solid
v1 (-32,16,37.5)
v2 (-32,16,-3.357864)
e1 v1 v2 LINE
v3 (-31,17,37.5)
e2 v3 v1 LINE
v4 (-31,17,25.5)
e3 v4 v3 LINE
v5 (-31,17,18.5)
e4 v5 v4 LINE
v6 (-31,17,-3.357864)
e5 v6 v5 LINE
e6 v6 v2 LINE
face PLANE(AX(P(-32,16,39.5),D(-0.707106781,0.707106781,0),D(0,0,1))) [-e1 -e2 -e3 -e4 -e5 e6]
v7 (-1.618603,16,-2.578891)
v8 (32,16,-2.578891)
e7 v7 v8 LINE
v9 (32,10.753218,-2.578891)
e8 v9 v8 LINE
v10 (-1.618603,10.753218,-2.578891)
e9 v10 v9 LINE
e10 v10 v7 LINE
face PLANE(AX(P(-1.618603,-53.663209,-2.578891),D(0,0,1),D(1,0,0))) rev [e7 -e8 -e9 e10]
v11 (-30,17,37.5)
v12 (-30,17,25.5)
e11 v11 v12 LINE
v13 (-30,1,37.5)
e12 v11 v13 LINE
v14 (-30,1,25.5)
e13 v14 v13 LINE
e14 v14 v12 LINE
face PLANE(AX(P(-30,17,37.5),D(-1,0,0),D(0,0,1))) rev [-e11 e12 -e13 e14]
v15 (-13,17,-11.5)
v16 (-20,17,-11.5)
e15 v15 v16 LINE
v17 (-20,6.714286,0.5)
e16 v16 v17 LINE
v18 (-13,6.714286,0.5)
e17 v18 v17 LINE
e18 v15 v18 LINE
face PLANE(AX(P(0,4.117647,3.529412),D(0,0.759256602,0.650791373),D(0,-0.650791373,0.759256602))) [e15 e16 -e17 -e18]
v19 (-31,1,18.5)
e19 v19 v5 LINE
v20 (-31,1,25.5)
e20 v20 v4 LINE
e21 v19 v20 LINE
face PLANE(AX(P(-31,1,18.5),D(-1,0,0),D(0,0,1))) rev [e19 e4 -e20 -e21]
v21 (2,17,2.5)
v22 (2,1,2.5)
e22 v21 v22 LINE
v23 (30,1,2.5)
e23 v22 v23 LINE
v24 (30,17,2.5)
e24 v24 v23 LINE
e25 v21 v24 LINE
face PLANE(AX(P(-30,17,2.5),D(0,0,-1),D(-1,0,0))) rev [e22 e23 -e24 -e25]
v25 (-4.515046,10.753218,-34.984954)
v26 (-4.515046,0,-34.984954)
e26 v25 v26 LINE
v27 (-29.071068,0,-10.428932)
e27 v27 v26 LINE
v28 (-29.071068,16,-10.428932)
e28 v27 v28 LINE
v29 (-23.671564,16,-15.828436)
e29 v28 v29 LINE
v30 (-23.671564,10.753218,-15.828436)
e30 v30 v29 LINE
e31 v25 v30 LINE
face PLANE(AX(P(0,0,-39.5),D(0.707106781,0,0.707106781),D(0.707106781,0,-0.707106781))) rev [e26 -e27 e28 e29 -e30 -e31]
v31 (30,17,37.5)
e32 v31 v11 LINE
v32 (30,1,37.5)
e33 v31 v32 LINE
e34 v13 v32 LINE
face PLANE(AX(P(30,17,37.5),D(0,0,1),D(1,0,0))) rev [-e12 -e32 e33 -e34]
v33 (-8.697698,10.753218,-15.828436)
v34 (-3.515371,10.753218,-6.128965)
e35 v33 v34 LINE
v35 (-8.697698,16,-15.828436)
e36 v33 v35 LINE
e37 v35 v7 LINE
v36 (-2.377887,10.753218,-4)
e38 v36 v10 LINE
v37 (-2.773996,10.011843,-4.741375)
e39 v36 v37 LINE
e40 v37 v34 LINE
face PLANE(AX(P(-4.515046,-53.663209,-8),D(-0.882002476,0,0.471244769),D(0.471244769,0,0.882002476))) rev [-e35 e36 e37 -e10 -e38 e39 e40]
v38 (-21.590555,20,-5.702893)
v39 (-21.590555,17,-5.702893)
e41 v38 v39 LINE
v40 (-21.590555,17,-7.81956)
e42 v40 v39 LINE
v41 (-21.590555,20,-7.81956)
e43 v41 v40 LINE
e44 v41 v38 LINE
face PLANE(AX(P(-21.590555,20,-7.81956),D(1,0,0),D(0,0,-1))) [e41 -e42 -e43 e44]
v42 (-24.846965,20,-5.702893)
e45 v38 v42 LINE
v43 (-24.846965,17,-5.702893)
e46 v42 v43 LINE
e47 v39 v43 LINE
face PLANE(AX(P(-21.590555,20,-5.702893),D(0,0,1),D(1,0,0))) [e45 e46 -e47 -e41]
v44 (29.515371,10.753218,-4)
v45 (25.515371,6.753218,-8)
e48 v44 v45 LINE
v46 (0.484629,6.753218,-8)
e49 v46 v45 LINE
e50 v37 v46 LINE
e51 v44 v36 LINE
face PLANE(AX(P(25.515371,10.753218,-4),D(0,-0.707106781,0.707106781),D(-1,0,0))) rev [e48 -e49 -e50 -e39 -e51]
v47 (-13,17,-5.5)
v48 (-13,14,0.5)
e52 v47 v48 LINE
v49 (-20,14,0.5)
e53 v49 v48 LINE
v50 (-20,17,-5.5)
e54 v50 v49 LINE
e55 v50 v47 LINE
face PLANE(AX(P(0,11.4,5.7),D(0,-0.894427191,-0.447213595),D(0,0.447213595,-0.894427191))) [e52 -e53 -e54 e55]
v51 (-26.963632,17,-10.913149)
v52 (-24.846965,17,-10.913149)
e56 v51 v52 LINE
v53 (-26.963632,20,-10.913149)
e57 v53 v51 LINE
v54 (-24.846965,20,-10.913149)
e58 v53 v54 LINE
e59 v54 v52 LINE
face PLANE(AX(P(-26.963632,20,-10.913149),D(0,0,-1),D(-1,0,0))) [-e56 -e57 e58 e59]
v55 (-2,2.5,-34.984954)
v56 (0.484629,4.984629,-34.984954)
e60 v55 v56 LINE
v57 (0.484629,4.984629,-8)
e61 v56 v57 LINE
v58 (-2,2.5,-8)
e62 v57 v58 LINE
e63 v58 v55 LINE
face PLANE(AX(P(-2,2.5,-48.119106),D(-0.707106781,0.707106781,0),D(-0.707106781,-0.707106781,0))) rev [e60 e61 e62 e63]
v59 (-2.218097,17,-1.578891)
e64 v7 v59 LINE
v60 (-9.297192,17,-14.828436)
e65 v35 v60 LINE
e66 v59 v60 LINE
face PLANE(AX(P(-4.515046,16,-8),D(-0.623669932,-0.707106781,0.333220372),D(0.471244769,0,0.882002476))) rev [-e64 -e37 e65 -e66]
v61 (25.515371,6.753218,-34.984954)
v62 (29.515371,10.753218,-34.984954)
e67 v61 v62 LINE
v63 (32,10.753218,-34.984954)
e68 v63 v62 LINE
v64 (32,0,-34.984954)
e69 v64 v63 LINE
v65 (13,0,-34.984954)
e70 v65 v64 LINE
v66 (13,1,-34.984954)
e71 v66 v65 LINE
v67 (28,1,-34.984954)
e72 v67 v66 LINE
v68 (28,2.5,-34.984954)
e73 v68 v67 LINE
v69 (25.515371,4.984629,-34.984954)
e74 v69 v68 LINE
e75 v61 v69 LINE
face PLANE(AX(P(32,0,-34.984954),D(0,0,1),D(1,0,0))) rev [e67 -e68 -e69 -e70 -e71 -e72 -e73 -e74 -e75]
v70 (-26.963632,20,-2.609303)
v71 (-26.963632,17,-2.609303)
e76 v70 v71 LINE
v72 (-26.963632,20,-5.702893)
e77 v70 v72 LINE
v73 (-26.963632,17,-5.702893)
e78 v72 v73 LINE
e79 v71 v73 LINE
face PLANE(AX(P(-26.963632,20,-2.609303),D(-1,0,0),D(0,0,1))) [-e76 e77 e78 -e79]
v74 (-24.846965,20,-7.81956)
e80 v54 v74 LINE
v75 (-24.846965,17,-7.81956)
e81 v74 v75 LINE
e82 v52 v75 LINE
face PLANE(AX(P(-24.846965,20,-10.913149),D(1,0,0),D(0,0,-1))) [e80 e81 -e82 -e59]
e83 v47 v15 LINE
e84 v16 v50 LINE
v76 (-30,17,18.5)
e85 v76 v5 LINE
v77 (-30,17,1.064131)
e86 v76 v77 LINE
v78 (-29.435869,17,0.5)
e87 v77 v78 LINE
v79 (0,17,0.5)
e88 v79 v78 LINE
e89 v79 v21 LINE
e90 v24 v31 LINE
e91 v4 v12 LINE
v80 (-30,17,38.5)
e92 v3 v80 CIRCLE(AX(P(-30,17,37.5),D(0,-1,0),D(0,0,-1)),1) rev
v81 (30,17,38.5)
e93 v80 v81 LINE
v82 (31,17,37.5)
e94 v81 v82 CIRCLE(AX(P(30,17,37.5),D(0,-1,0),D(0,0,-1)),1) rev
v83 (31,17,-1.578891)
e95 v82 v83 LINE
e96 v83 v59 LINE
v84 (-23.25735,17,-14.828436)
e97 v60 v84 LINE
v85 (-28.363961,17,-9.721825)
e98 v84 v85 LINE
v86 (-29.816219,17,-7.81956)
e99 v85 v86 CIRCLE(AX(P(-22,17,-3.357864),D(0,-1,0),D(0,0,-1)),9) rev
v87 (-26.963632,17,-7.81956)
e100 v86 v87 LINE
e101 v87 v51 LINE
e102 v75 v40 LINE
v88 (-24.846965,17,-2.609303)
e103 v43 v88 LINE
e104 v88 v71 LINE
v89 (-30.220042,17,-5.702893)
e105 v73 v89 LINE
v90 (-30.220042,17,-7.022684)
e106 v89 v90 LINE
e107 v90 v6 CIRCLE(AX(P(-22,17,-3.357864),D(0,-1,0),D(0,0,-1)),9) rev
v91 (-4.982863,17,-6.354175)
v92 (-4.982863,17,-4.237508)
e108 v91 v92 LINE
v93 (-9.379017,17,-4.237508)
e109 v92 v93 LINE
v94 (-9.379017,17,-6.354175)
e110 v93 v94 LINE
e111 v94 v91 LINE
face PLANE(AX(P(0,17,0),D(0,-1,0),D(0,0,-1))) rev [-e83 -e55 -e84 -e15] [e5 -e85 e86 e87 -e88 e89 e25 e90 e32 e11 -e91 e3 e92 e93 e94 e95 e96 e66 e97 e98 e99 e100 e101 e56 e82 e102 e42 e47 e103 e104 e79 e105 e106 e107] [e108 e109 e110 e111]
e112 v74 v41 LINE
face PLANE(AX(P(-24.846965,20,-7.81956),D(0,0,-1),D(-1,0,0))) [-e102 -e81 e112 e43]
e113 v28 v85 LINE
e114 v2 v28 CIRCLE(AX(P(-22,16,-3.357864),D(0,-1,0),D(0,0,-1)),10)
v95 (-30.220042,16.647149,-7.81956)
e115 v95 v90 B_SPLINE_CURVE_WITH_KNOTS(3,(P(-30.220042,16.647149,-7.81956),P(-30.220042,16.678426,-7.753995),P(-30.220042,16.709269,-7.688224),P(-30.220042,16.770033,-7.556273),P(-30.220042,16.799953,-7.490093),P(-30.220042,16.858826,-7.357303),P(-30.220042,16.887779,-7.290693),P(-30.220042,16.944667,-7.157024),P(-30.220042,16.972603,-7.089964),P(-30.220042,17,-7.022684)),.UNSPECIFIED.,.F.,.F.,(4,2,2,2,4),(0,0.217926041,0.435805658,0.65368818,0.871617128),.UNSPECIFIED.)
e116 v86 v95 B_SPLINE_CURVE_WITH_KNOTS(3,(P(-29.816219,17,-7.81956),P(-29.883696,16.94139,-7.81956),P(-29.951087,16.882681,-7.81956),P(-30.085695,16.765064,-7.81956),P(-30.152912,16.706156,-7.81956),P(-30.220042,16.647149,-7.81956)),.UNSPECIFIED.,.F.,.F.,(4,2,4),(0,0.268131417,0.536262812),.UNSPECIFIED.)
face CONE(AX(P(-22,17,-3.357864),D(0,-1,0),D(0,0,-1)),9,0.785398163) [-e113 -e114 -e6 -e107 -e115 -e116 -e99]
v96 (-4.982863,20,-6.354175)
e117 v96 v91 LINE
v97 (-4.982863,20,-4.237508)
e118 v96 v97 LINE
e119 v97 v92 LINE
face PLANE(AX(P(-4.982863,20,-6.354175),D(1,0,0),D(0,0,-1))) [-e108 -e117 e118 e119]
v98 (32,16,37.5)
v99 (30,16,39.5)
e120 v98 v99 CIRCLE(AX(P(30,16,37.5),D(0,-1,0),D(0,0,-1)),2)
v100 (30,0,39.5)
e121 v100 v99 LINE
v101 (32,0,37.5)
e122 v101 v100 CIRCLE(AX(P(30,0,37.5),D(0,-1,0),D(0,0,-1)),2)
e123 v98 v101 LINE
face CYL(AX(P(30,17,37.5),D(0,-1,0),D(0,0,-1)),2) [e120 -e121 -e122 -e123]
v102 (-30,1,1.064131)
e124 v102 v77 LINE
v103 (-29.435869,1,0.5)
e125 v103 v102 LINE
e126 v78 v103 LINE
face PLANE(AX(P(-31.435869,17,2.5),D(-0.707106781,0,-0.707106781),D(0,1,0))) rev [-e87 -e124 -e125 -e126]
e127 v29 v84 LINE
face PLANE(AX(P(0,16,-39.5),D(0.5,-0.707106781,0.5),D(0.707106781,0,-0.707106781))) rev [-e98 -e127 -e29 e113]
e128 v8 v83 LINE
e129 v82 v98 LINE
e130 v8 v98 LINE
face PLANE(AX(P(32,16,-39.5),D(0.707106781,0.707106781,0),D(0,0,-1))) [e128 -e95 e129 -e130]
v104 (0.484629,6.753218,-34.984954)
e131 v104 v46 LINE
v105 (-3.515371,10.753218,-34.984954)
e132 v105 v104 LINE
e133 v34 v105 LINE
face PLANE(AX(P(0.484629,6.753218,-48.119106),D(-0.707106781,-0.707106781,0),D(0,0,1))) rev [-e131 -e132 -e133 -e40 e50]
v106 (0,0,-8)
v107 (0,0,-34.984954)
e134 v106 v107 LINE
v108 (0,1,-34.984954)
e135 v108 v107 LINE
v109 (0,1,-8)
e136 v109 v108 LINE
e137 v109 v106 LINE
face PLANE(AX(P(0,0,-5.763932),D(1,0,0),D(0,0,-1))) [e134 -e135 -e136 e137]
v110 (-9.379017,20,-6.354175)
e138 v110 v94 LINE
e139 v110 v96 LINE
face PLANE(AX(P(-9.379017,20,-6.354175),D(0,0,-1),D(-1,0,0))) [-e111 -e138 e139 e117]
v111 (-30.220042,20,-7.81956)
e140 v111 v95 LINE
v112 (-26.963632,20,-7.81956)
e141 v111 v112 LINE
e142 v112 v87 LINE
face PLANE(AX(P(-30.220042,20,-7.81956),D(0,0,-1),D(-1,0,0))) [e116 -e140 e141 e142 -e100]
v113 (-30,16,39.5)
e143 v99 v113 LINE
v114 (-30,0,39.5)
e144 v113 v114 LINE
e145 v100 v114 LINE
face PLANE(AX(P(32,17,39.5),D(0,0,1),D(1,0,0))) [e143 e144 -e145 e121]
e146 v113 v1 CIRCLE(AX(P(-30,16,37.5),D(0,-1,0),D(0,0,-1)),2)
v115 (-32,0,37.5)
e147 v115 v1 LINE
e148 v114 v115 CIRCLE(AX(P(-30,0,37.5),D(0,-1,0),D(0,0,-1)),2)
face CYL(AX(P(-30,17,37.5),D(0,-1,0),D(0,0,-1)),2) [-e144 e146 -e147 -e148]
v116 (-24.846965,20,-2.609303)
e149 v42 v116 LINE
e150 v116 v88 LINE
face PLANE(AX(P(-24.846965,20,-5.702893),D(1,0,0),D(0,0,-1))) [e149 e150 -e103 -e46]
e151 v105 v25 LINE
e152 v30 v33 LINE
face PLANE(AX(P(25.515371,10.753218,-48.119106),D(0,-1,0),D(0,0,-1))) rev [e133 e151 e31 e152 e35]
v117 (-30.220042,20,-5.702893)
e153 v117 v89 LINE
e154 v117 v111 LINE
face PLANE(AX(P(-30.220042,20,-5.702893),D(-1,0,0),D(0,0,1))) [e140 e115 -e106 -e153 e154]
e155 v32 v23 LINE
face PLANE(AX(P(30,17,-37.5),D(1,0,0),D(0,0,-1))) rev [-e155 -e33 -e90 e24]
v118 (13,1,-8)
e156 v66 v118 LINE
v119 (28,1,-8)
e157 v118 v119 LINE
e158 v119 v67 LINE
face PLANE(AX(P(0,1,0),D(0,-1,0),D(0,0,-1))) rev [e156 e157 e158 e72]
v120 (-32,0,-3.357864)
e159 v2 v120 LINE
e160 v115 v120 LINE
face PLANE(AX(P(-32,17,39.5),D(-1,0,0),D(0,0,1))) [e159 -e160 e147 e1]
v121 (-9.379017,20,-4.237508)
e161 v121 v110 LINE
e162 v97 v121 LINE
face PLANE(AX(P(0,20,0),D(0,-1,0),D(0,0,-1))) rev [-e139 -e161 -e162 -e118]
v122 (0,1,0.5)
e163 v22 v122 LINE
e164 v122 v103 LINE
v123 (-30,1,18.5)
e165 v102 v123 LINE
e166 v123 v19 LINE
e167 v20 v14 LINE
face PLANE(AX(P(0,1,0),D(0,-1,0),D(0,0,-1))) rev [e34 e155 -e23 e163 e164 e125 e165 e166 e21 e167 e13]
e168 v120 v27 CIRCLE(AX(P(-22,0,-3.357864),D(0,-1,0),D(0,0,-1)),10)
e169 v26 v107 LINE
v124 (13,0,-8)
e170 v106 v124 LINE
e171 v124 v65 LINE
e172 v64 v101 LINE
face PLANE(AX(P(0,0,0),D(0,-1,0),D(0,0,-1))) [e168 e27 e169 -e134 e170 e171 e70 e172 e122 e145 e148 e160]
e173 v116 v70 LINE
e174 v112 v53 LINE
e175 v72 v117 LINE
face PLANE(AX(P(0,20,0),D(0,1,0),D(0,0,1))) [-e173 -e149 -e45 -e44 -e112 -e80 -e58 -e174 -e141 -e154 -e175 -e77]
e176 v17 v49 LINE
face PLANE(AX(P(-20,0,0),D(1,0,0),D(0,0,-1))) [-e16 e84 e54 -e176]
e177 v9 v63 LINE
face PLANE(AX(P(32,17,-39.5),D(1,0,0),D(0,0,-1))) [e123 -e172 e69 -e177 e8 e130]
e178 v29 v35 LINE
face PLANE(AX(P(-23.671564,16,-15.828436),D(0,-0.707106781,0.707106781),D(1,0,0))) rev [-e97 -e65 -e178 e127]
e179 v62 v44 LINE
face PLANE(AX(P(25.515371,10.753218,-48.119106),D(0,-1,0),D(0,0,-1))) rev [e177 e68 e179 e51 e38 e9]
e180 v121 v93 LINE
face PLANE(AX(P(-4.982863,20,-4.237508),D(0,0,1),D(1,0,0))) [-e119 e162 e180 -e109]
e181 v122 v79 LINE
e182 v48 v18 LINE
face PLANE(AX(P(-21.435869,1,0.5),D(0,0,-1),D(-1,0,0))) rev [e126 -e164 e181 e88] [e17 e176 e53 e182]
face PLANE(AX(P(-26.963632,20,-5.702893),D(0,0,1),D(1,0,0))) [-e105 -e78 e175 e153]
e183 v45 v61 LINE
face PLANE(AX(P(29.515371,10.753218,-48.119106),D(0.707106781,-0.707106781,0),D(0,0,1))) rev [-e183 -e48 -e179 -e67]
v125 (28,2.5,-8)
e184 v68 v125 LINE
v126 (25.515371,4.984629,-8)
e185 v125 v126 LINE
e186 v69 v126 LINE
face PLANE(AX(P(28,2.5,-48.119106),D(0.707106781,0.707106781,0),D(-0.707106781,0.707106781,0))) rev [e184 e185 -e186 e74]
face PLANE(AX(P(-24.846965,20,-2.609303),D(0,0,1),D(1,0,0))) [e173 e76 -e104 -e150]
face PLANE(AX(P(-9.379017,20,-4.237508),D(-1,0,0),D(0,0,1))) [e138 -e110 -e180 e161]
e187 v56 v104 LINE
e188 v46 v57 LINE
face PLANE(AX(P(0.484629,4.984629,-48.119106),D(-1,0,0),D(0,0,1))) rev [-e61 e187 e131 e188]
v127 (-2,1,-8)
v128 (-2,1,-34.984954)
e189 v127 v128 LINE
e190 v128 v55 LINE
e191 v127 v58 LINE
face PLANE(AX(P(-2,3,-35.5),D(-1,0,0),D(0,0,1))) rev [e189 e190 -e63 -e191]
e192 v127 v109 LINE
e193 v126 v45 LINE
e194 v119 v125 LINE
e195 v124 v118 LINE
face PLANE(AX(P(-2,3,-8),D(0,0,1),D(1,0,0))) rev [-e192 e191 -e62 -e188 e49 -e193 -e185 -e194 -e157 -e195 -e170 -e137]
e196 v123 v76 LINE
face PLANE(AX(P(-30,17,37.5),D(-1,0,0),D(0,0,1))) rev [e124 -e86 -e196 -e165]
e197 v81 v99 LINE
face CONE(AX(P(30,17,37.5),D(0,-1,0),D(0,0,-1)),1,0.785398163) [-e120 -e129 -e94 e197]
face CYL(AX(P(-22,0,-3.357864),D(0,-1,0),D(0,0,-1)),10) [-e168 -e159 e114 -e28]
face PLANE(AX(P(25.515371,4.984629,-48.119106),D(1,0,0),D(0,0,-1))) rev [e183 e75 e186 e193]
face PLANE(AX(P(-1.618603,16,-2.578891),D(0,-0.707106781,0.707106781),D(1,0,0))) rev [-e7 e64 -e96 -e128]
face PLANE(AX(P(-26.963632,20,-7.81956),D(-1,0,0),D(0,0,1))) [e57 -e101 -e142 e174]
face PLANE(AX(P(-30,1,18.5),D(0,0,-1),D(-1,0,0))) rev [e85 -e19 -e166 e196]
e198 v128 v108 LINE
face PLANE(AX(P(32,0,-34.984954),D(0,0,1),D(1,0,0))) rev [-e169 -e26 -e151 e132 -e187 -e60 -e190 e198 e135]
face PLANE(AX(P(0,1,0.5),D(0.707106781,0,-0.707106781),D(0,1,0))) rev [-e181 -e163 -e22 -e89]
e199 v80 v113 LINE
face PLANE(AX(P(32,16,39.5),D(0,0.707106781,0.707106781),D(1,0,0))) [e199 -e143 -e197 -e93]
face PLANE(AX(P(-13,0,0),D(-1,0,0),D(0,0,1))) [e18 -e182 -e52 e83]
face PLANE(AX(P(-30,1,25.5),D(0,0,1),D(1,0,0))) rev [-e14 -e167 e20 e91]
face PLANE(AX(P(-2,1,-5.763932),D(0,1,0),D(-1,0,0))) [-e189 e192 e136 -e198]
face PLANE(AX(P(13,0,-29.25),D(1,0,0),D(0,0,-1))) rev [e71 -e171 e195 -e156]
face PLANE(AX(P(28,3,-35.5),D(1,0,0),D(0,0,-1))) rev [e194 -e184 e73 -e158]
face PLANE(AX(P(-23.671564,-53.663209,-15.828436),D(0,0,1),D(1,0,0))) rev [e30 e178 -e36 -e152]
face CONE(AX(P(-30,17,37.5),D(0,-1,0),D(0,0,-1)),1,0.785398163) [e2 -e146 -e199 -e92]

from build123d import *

# Parameters (mm, degrees)
SKETCH1_W           = 60
SKETCH1_H           = 75
BOSS_EXTRUDE1_DEPTH = 1
SKETCH2_W           = 64
SKETCH2_H           = 79
SKETCH2_W_2         = 60
SKETCH2_H_2         = 75
BOSS_EXTRUDE2_DEPTH = 17
SKETCH3_W           = 60
SKETCH3_H           = 40
BOSS_EXTRUDE3_DEPTH = 16
SKETCH4_W           = 1
SKETCH4_H           = 7
CUT_EXTRUDE1_DEPTH  = 16
CUT_LOFT2_START     = -20
CUT_LOFT2_DEPTH     = 7
SKETCH7_W           = 21.435869032
SKETCH7_H           = 2
CUT_EXTRUDE2_DEPTH  = 16
CHAMFER1_SIZE       = 10
CHAMFER2_SIZE       = 2
SKETCH9_W           = 30
SKETCH9_H           = 27.5
CUT_EXTRUDE3_DEPTH  = 14
SKETCH10_W          = 2
SKETCH10_H          = 2
BOSS_EXTRUDE5_DEPTH = 7
CUT_EXTRUDE4_DEPTH  = 54.602705156
FILLET1_R           = 10
FILLET2_R           = 10
FILLET3_R           = 2
SKETCH13_W          = 4.396153847
SKETCH13_H          = 2.116666667
BOSS_EXTRUDE7_DEPTH = 3
SKETCH14_W          = 15
SKETCH14_H          = 21.25
CUT_EXTRUDE5_DEPTH  = 52.809748118
CUT_EXTRUDE6_DEPTH  = 9
SKETCH16_W          = 15
SKETCH16_H          = 17.83101705
CUT_EXTRUDE7_DEPTH  = 54.602705156
BOSS_EXTRUDE8_REACH = 62.665
SKETCH18_W          = 40.424998059
SKETCH18_H          = 8.849345581
CUT_EXTRUDE8_DEPTH  = 54.602705156
CUT_EXTRUDE9_DEPTH  = 6.246782155
CHAMFER3_SIZE       = 1
CHAMFER4_SIZE       = 4
SKETCH20_W          = 2
SKETCH20_H          = 1
BOSS_EXTRUDE9_DEPTH = 26.984954309


# Read off the part's stored shape, not the designer's step: Cut-Loft2
# Some blends are built 0.0001 mm under size
with BuildPart() as part:
    # Sketch1 → Boss-Extrude1 (new body)
    with BuildSketch(Plane(origin=(0, 0, 0), x_dir=(1, 0, 0), z_dir=(0, 1, 0))):
        Rectangle(SKETCH1_W, SKETCH1_H)
    extrude(amount=BOSS_EXTRUDE1_DEPTH)

    # Sketch2 → Boss-Extrude2 (add)
    with BuildSketch(Plane.XZ):
        Rectangle(SKETCH2_W, SKETCH2_H)
        Rectangle(SKETCH2_W_2, SKETCH2_H_2, mode=Mode.SUBTRACT)
    extrude(amount=-BOSS_EXTRUDE2_DEPTH)

    # Sketch3 → Boss-Extrude3 (add)
    with BuildSketch(Plane(origin=(0, 1, 0), x_dir=(1, 0, 0), z_dir=(0, 1, 0))):
        with Locations((0, 17.5)):
            Rectangle(SKETCH3_W, SKETCH3_H)
    extrude(amount=BOSS_EXTRUDE3_DEPTH)

    # Sketch4 → Cut-Extrude1 (cut)
    with BuildSketch(Plane(origin=(0, 17, 0), x_dir=(1, 0, 0), z_dir=(0, 1, 0))):
        with Locations((-30.5, -22)):
            Rectangle(SKETCH4_W, SKETCH4_H)
    extrude(amount=-CUT_EXTRUDE1_DEPTH, mode=Mode.SUBTRACT)

    # Cut-Loft2 outline → Cut-Loft2 (cut)
    with BuildSketch(Plane.YZ.offset(CUT_LOFT2_START)):
        Polygon((17, -5.5), (13, 2.5), (5, 2.5), (17, -11.5), align=None)
    extrude(amount=CUT_LOFT2_DEPTH, mode=Mode.SUBTRACT)

    # Sketch7 → Cut-Extrude2 (cut)
    with BuildSketch(Plane(origin=(0, 17, 0), x_dir=(1, 0, 0), z_dir=(0, 1, 0))):
        with Locations((-10.717934516, -1.5)):
            Rectangle(SKETCH7_W, SKETCH7_H)
    extrude(amount=-CUT_EXTRUDE2_DEPTH, mode=Mode.SUBTRACT)

    # Chamfer1
    # the kernel refuses this chamfer: 10 mm, written as the material it takes off along each edge
    with BuildSketch(Plane(origin=(-21.435869032, 42.71682988, 2.5), x_dir=(-0.9996219169112968, 0, 0.02749587661058636), z_dir=(0, -1, 0))) as chamfer1_piece_1_section:
        Polygon((CHAMFER1_SIZE * 0.999621916911, CHAMFER1_SIZE * 0.0274958766106), (-CHAMFER1_SIZE * 0.0274958766106, CHAMFER1_SIZE * 0.999621916911), (0, 0), align=None)
    chamfer1_piece_1 = extrude(amount=41.71682988, mode=Mode.PRIVATE)
    chamfer1_piece_1 = split(chamfer1_piece_1, bisect_by=Plane(origin=(-30, 9, 1.507613822), z_dir=(1, 0, 0)), keep=Keep.TOP, mode=Mode.PRIVATE)
    chamfer1_piece_1 = split(chamfer1_piece_1, bisect_by=Plane(origin=(-25.679544331, 9, 0.5), z_dir=(0, 0, 1)), keep=Keep.TOP, mode=Mode.PRIVATE)
    add(chamfer1_piece_1, mode=Mode.SUBTRACT)

    # Chamfer2
    chamfer2_edges = [part.edges().sort_by_distance(p)[0] for p in [
        (0, 9, 2.5),
    ]]
    chamfer(chamfer2_edges, length=CHAMFER2_SIZE - 0.0001)  # a hair under: the kernel refuses the full size

    # Sketch9 → Cut-Extrude3 (cut)
    with BuildSketch(Plane(origin=(0, 17, 0), x_dir=(1, 0, 0), z_dir=(0, 1, 0))):
        with Locations((13, 21.75)):
            Rectangle(SKETCH9_W, SKETCH9_H)
    extrude(amount=-CUT_EXTRUDE3_DEPTH, mode=Mode.SUBTRACT)

    # Sketch10 → Boss-Extrude5 (add)
    with BuildSketch(Plane(origin=(0, 3, 0), x_dir=(1, 0, 0), z_dir=(0, 1, 0))):
        Polygon((-2, 23), (10, 23), (10, 8), (28, 8), (28, 35.5), (-2, 35.5), align=None)
        with Locations((-1, 9)):
            Rectangle(SKETCH10_W, SKETCH10_H)
    extrude(amount=BOSS_EXTRUDE5_DEPTH)

    # Sketch11 → Cut-Extrude4 (cut, through all)
    with BuildSketch(Plane(origin=(0, 17, 0), x_dir=(1, 0, 0), z_dir=(0, 1, 0))):
        Polygon((0, 39.5), (-32, 7.5), (-32, 39.5), align=None)
    extrude(amount=-CUT_EXTRUDE4_DEPTH, mode=Mode.SUBTRACT)

    # Fillet1
    fillet1_edges = [part.edges().sort_by_distance(p)[0] for p in [
        (-32, 8.5, -7.5),
    ]]
    fillet(fillet1_edges, radius=FILLET1_R)

    # Fillet2
    fillet2_edges = [part.edges().sort_by_distance(p)[0] for p in [
        (0, 8.5, -39.5),
    ]]
    fillet(fillet2_edges, radius=FILLET2_R)

    # Fillet3
    fillet3_edges = [part.edges().sort_by_distance(p)[0] for p in [
        (32, 8.5, -39.5),
        (-32, 8.5, 39.5),
        (32, 8.5, 39.5),
    ]]
    fillet(fillet3_edges, radius=FILLET3_R)

    # Sketch13 → Boss-Extrude7 (add)
    with BuildSketch(Plane(origin=(0, 17, 0), x_dir=(1, 0, 0), z_dir=(0, 1, 0))):
        Polygon((-26.96363203, 7.819559599), (-26.96363203, 10.913149343), (-24.846965364, 10.913149343), (-24.846965364, 7.819559599), (-21.590555107, 7.819559599), (-21.590555107, 5.702892932), (-24.846965364, 5.702892932), (-24.846965364, 2.609303189), (-26.96363203, 2.609303189), (-26.96363203, 5.702892932), (-30.220042287, 5.702892932), (-30.220042287, 7.819559599), align=None)
        with Locations((-7.180939722, 5.29584165)):
            Rectangle(SKETCH13_W, SKETCH13_H)
    extrude(amount=BOSS_EXTRUDE7_DEPTH)

    # Sketch14 → Cut-Extrude5 (cut, through all)
    with BuildSketch(Plane(origin=(0, 10, 0), x_dir=(1, 0, 0), z_dir=(0, 1, 0))):
        with Locations((5.5, 18.625)):
            Rectangle(SKETCH14_W, SKETCH14_H)
    extrude(amount=-CUT_EXTRUDE5_DEPTH, mode=Mode.SUBTRACT)

    # Sketch15 → Cut-Extrude6 (cut)
    with BuildSketch(Plane(origin=(0, 10, 0), x_dir=(1, 0, 0), z_dir=(0, 1, 0))):
        Polygon((-2, 29.25), (13, 29.25), (13, 8), (28, 8), (28, 35.5), (-2, 35.5), align=None)
    extrude(amount=-CUT_EXTRUDE6_DEPTH, mode=Mode.SUBTRACT)

    # Sketch16 → Cut-Extrude7 (cut, through all)
    with BuildSketch(Plane(origin=(0, 17, 0), x_dir=(1, 0, 0), z_dir=(0, 1, 0))):
        with BuildLine():
            Line((-2, 37.391398481), (-2, 35.5))
            Line((-2, 35.5), (13, 35.5))
            Line((13, 35.5), (28, 35.5))
            Line((28, 35.5), (28, 39.5))
            Line((28, 39.5), (4.142135624, 39.5))
            ThreePointArc((4.142135624, 39.5), (0.89513584, 38.958170669), (-2, 37.391398481))
        make_face()
        with BuildLine():
            Line((-2, 41.583442656), (-2, 37.391398481))
            ThreePointArc((-2, 37.391398481), (0.89513584, 38.958170669), (4.142135624, 39.5))
            Line((4.142135624, 39.5), (28, 39.5))
            Line((28, 39.5), (28, 41.583442656))
            Line((28, 41.583442656), (-2, 41.583442656))
        make_face()
        with Locations((5.5, 26.584491475)):
            Rectangle(SKETCH16_W, SKETCH16_H)
    extrude(amount=-CUT_EXTRUDE7_DEPTH, mode=Mode.SUBTRACT)

    # Boss-Extrude8: up to this face of the body (flat: up to its plane)
    boss_extrude8_end = Plane(part.part.faces().sort_by_distance((29, 8.5, -39.5))[0])
    # Sketch17 → Boss-Extrude8 (add, up to the picked face)
    with BuildSketch(Plane(origin=(0, 0, -8), x_dir=(-1, 0, 0), z_dir=(0, 0, -1)), mode=Mode.PRIVATE) as boss_extrude8_sk1:
        Polygon((-28, 2.5), (-25.515371071, 4.984628929), (-25.515371071, 10.753217845), (-28, 10.753217845), align=None)
    boss_extrude8_tool1 = split(extrude(boss_extrude8_sk1.sketch, amount=BOSS_EXTRUDE8_REACH, mode=Mode.PRIVATE), bisect_by=boss_extrude8_end, keep=Keep.BOTH, mode=Mode.PRIVATE)
    # Sketch17 → Boss-Extrude8 (add, up to the picked face)
    with BuildSketch(Plane(origin=(0, 0, -8), x_dir=(-1, 0, 0), z_dir=(0, 0, -1)), mode=Mode.PRIVATE) as boss_extrude8_sk2:
        Polygon((2, 2.5), (-0.484628929, 4.984628929), (-0.484628929, 10.753217845), (2, 10.753217845), align=None)
    boss_extrude8_tool2 = split(extrude(boss_extrude8_sk2.sketch, amount=BOSS_EXTRUDE8_REACH, mode=Mode.PRIVATE), bisect_by=boss_extrude8_end, keep=Keep.BOTH, mode=Mode.PRIVATE)
    add(boss_extrude8_tool1.solids().sort_by(Axis((26.831064, 7.211077, -8), (0, 0, -1)))[0])
    add(boss_extrude8_tool2.solids().sort_by(Axis((-0.831064, 7.211077, -8), (0, 0, -1)))[0])

    # Sketch18 → Cut-Extrude8 (cut, through all)
    with BuildSketch(Plane(origin=(0, 17, 0), x_dir=(1, 0, 0), z_dir=(0, 1, 0))):
        with Locations((11.787500971, 39.409627099)):
            Rectangle(SKETCH18_W, SKETCH18_H)
    extrude(amount=-CUT_EXTRUDE8_DEPTH, mode=Mode.SUBTRACT)

    # Sketch19 → Cut-Extrude9 (cut)
    with BuildSketch(Plane(origin=(0, 17, 0), x_dir=(1, 0, 0), z_dir=(0, 1, 0))):
        Polygon((28, 34.984954309), (28, 8), (-2, 8), (-2, 34.984954309), (-4.515045691, 34.984954309), (-23.671563877, 15.828436123), (-8.697697865, 15.828436123), (-4.515045691, 8), (-1.618603226, 2.578890647), (32, 2.578890647), (32, 34.984954309), align=None)
    extrude(amount=-CUT_EXTRUDE9_DEPTH, mode=Mode.SUBTRACT)

    # Chamfer3
    # the kernel refuses this chamfer: 1 mm, written as the material it takes off along each edge
    with BuildSketch(Plane(origin=(-21.853109397, 17, -17.646890603), x_dir=(0.7068394360706796, 0.02749587661058563, 0.7068394360706675), z_dir=(-0.7071067811865415, 0, 0.7071067811865536))) as chamfer3_piece_1:
        Polygon((CHAMFER3_SIZE * 0.999621916911, -CHAMFER3_SIZE * 0.0274958766106), (-CHAMFER3_SIZE * 0.0274958766106, -CHAMFER3_SIZE * 0.999621916911), (0, 0), align=None)
    extrude(amount=10.207734683, mode=Mode.SUBTRACT)
    with BuildSketch(Plane(origin=(-22, 17, -3.357864376), x_dir=(-0.7071067811865538, 0, -0.7071067811865412), z_dir=(0.7071067811865412, 0, -0.7071067811865538))) as chamfer3_piece_2_section:
        Polygon((10 - CHAMFER3_SIZE, 0), (10, -CHAMFER3_SIZE), (10, 0), align=None)
    chamfer3_piece_2 = revolve(axis=Axis((-22, 17, -3.357864376), (0, 1, 0)), revolution_arc=45, mode=Mode.PRIVATE)
    chamfer3_piece_2 = split(chamfer3_piece_2, bisect_by=Plane(origin=(-29.540972518, 16.686713644, -7.819559599), z_dir=(0, 0, -1)), keep=Keep.TOP, mode=Mode.PRIVATE)
    chamfer3_piece_2 = split(chamfer3_piece_2, bisect_by=Plane(origin=(-30.220042287, 16.686713644, -9.324246754), z_dir=(1, 0, 0)), keep=Keep.TOP, mode=Mode.PRIVATE)
    add(chamfer3_piece_2, mode=Mode.SUBTRACT)
    with BuildSketch(Plane(origin=(-22, 17, -3.357864376), x_dir=(-0.7071067811865538, 0, -0.7071067811865412), z_dir=(0.7071067811865412, 0, -0.7071067811865538))) as chamfer3_piece_3_section:
        Polygon((10 - CHAMFER3_SIZE, 0), (10, -CHAMFER3_SIZE), (10, 0), align=None)
    chamfer3_piece_3 = revolve(axis=Axis((-22, 17, -3.357864376), (0, 1, 0)), revolution_arc=45, mode=Mode.PRIVATE)
    chamfer3_piece_3 = split(chamfer3_piece_3, bisect_by=Plane(origin=(-30.497975993, 16.585042802, -7.819559599), z_dir=(0, 0, -1)), keep=Keep.TOP, mode=Mode.PRIVATE)
    chamfer3_piece_3 = split(chamfer3_piece_3, bisect_by=Plane(origin=(-30.220042287, 16.585042802, -8.286119393), z_dir=(-1, 0, 0)), keep=Keep.TOP, mode=Mode.PRIVATE)
    add(chamfer3_piece_3, mode=Mode.SUBTRACT)
    with BuildSketch(Plane(origin=(-22, 17, -3.357864376), x_dir=(-0.7071067811865538, 0, -0.7071067811865412), z_dir=(0.7071067811865412, 0, -0.7071067811865538))) as chamfer3_piece_4_section:
        Polygon((10 - CHAMFER3_SIZE, 0), (10, -CHAMFER3_SIZE), (10, 0), align=None)
    chamfer3_piece_4 = revolve(axis=Axis((-22, 17, -3.357864376), (0, 1, 0)), revolution_arc=45, mode=Mode.PRIVATE)
    chamfer3_piece_4 = split(chamfer3_piece_4, bisect_by=Plane(origin=(-31.314504081, 16.6678644, -7.819559599), z_dir=(0, 0, 1)), keep=Keep.TOP, mode=Mode.PRIVATE)
    chamfer3_piece_4 = split(chamfer3_piece_4, bisect_by=Plane(origin=(-30.220042287, 16.6678644, -5.613397868), z_dir=(-1, 0, 0)), keep=Keep.TOP, mode=Mode.PRIVATE)
    add(chamfer3_piece_4, mode=Mode.SUBTRACT)
    with BuildSketch(Plane(origin=(30, 17, 39.5), x_dir=(0, 0.02749587661058555, -0.9996219169112968), z_dir=(-1, 0, 0))) as chamfer3_piece_5:
        Polygon((CHAMFER3_SIZE * 0.999621916911, CHAMFER3_SIZE * 0.0274958766106), (-CHAMFER3_SIZE * 0.0274958766106, CHAMFER3_SIZE * 0.999621916911), (0, 0), align=None)
    extrude(amount=60, mode=Mode.SUBTRACT)
    with BuildSketch(Plane(origin=(-32, 17, 37.5), x_dir=(0.9996219169112968, 0.027495876610585647, 0), z_dir=(0, 0, -1))) as chamfer3_piece_6:
        Polygon((CHAMFER3_SIZE * 0.999621916911, CHAMFER3_SIZE * 0.0274958766106), (-CHAMFER3_SIZE * 0.0274958766106, CHAMFER3_SIZE * 0.999621916911), (0, 0), align=None)
    extrude(amount=40.857864376, mode=Mode.SUBTRACT)
    with BuildSketch(Plane(origin=(30, 17, 37.5), x_dir=(1, 0, 0), z_dir=(0, 0, -1))) as chamfer3_piece_7:
        Polygon((2 - CHAMFER3_SIZE, 0), (2, CHAMFER3_SIZE), (2, 0), align=None)
    revolve(axis=Axis((30, 17, 37.5), (0, -1, 0)), revolution_arc=90, mode=Mode.SUBTRACT)
    with BuildSketch(Plane(origin=(-30, 17, 37.5), x_dir=(-1, 0, 0), z_dir=(0, 0, -1))) as chamfer3_piece_8:
        Polygon((2 - CHAMFER3_SIZE, 0), (2, -CHAMFER3_SIZE), (2, 0), align=None)
    revolve(axis=Axis((-30, 17, 37.5), (0, 1, 0)), revolution_arc=90, mode=Mode.SUBTRACT)
    with BuildSketch(Plane(origin=(32, 17, -5.150573635), x_dir=(-0.9996219169112968, 0.027495876610585647, 0), z_dir=(0, 0, 1))) as chamfer3_piece_9:
        Polygon((CHAMFER3_SIZE * 0.999621916911, CHAMFER3_SIZE * 0.0274958766106), (-CHAMFER3_SIZE * 0.0274958766106, CHAMFER3_SIZE * 0.999621916911), (0, 0), align=None)
    extrude(amount=42.650573635, mode=Mode.SUBTRACT)
    with BuildSketch(Plane(origin=(-26.243246865, 17, -15.828436123), x_dir=(0, 0.027495876610585647, 0.9996219169112968), z_dir=(1, 0, 0))) as chamfer3_piece_10:
        Polygon((CHAMFER3_SIZE * 0.999621916911, CHAMFER3_SIZE * 0.0274958766106), (-CHAMFER3_SIZE * 0.0274958766106, CHAMFER3_SIZE * 0.999621916911), (0, 0), align=None)
    extrude(amount=20.117231987, mode=Mode.SUBTRACT)
    with BuildSketch(Plane(origin=(-0.40671107, 17, -0.310659884), x_dir=(-0.8816690057056329, 0.02749587661058563, 0.47106659948191654), z_dir=(-0.4712447691597757, 0, -0.8820024759259748))) as chamfer3_piece_11_section:
        Polygon((CHAMFER3_SIZE * 0.999621916911, -CHAMFER3_SIZE * 0.0274958766106), (-CHAMFER3_SIZE * 0.0274958766106, -CHAMFER3_SIZE * 0.999621916911), (0, 0), align=None)
    chamfer3_piece_11 = extrude(amount=20.16548421, mode=Mode.PRIVATE)
    chamfer3_piece_11 = split(chamfer3_piece_11, bisect_by=Plane(origin=(-6.094530001, 16.669164986, -2.578890647), z_dir=(0, 0, -1)), keep=Keep.TOP, mode=Mode.PRIVATE)
    add(chamfer3_piece_11, mode=Mode.SUBTRACT)
    with BuildSketch(Plane(origin=(-4.190286214, 17, -2.578890647), x_dir=(0, 0.02749587661058563, 0.9996219169112968), z_dir=(1, 0, 0))) as chamfer3_piece_12_section:
        Polygon((CHAMFER3_SIZE * 0.999621916911, CHAMFER3_SIZE * 0.0274958766106), (-CHAMFER3_SIZE * 0.0274958766106, CHAMFER3_SIZE * 0.999621916911), (0, 0), align=None)
    chamfer3_piece_12 = extrude(amount=38.761969201, mode=Mode.PRIVATE)
    chamfer3_piece_12 = split(chamfer3_piece_12, bisect_by=Plane(origin=(2.556007493, 16.669702724, 5.234494733), z_dir=(0.8820024759259748, 0, -0.47124476915977576)), keep=Keep.TOP, mode=Mode.PRIVATE)
    add(chamfer3_piece_12, mode=Mode.SUBTRACT)
    with BuildSketch(Plane(origin=(-4.190286214, 17, -2.578890647), x_dir=(0, 0.02749587661058563, 0.9996219169112968), z_dir=(1, 0, 0))) as chamfer3_piece_13a_section:
        Polygon((CHAMFER3_SIZE * 0.999621916911, CHAMFER3_SIZE * 0.0274958766106), (-CHAMFER3_SIZE * 0.0274958766106, CHAMFER3_SIZE * 0.999621916911), (0, 0), align=None)
    chamfer3_piece_13a = extrude(amount=38.761969201, mode=Mode.PRIVATE)
    chamfer3_piece_13a = split(chamfer3_piece_13a, bisect_by=Plane(origin=(-1.74164745, 16.676807244, -2.80918564), z_dir=(-0.8820024759259748, 0, 0.47124476915977576)), keep=Keep.TOP, mode=Mode.PRIVATE)
    with BuildSketch(Plane(origin=(-0.40671107, 17, -0.310659884), x_dir=(-0.8816690057056329, 0.02749587661058563, 0.47106659948191654), z_dir=(-0.4712447691597757, 0, -0.8820024759259748))) as chamfer3_piece_13b_section:
        Polygon((CHAMFER3_SIZE * 0.999621916911, -CHAMFER3_SIZE * 0.0274958766106), (-CHAMFER3_SIZE * 0.0274958766106, -CHAMFER3_SIZE * 0.999621916911), (0, 0), align=None)
    chamfer3_piece_13b = extrude(amount=20.16548421, mode=Mode.PRIVATE)
    chamfer3_piece_13b = split(chamfer3_piece_13b, bisect_by=Plane(origin=(-1.357498525, 16.676807244, -2.578890647), z_dir=(0, 0, 1)), keep=Keep.TOP, mode=Mode.PRIVATE)
    chamfer3_piece_13 = chamfer3_piece_13a & chamfer3_piece_13b
    add(chamfer3_piece_13, mode=Mode.SUBTRACT)

    # Chamfer4
    # the kernel refuses this chamfer: 4 mm, written as the material it takes off along each edge
    with BuildSketch(Plane(origin=(0.484628929, 10.753217845, -8), x_dir=(0.02749587660983432, -0.9996219169113173, 0), z_dir=(0, 0, -1))) as chamfer4_piece_1:
        Polygon((CHAMFER4_SIZE * 0.999621916911, CHAMFER4_SIZE * 0.0274958766098), (-CHAMFER4_SIZE * 0.0274958766631, CHAMFER4_SIZE * 0.99962191691), (0, 0), align=None)
    extrude(amount=37.271686261, mode=Mode.SUBTRACT)
    with BuildSketch(Plane(origin=(25.515371071, 10.753217845, -8), x_dir=(-0.027495876609834723, -0.9996219169113173, 0), z_dir=(0, 0, -1))) as chamfer4_piece_2:
        Polygon((CHAMFER4_SIZE * 0.999621916911, -CHAMFER4_SIZE * 0.0274958766098), (-CHAMFER4_SIZE * 0.0274958766631, -CHAMFER4_SIZE * 0.99962191691), (0, 0), align=None)
    extrude(amount=37.271686261, mode=Mode.SUBTRACT)
    with BuildSketch(Plane(origin=(25.515371071, 10.753217845, -8), x_dir=(0, -0.9996219169112968, -0.027495876610586494), z_dir=(-1, 0, 0))) as chamfer4_piece_3:
        Polygon((CHAMFER4_SIZE * 0.999621916911, CHAMFER4_SIZE * 0.0274958766106), (-CHAMFER4_SIZE * 0.0274958766106, CHAMFER4_SIZE * 0.999621916911), (0, 0), align=None)
    extrude(amount=25.030742141, mode=Mode.SUBTRACT)
    with BuildSketch(Plane(origin=(25.515371071, 10.753217845, -8), x_dir=(0, -0.9996219169112968, -0.027495876610586494), z_dir=(-1, 0, 0))) as chamfer4_piece_4a_section:
        Polygon((CHAMFER4_SIZE * 0.999621916911, CHAMFER4_SIZE * 0.0274958766106), (-CHAMFER4_SIZE * 0.0274958766106, CHAMFER4_SIZE * 0.999621916911), (0, 0), align=None)
    chamfer4_piece_4a = extrude(amount=35.317474093, mode=Mode.PRIVATE)
    chamfer4_piece_4a = split(chamfer4_piece_4a, bisect_by=Plane(origin=(-3.393376338, 9.366470533, -5.900634211), z_dir=(0.8820024759259748, 0, -0.47124476915977576)), keep=Keep.TOP, mode=Mode.PRIVATE)
    chamfer4_piece_4a = split(chamfer4_piece_4a, bisect_by=Plane(origin=(0.484628929, 9.366470533, -6.807223288), z_dir=(-1, 0, 0)), keep=Keep.TOP, mode=Mode.PRIVATE)
    with BuildSketch(Plane(origin=(0.484628929, 10.753217845, 2.286731952), x_dir=(0.027495876610586358, -0.9996219169112968, 0), z_dir=(0, 0, -1))) as chamfer4_piece_4b_section:
        Polygon((CHAMFER4_SIZE * 0.999621916911, CHAMFER4_SIZE * 0.0274958766106), (-CHAMFER4_SIZE * 0.0274958766106, CHAMFER4_SIZE * 0.999621916911), (0, 0), align=None)
    chamfer4_piece_4b = extrude(amount=47.558418213, mode=Mode.PRIVATE)
    chamfer4_piece_4b = split(chamfer4_piece_4b, bisect_by=Plane(origin=(-2.589795619, 9.377652702, -4.396617127), z_dir=(0.8820024759259748, 0, -0.47124476915977576)), keep=Keep.TOP, mode=Mode.PRIVATE)
    chamfer4_piece_4b = split(chamfer4_piece_4b, bisect_by=Plane(origin=(-0.726846109, 9.377652702, -2.578890647), z_dir=(0, 0, -1)), keep=Keep.TOP, mode=Mode.PRIVATE)
    chamfer4_piece_4b = split(chamfer4_piece_4b, bisect_by=Plane(origin=(-0.726846109, 9.377652702, -8), z_dir=(0, 0, 1)), keep=Keep.TOP, mode=Mode.PRIVATE)
    chamfer4_piece_4 = chamfer4_piece_4a & chamfer4_piece_4b
    add(chamfer4_piece_4, mode=Mode.SUBTRACT)
    with BuildSketch(Plane(origin=(35.802103022, 10.753217845, -8), x_dir=(0, -0.9996219169112968, -0.027495876610586494), z_dir=(-1, 0, 0))) as chamfer4_piece_5a_section:
        Polygon((CHAMFER4_SIZE * 0.999621916911, CHAMFER4_SIZE * 0.0274958766106), (-CHAMFER4_SIZE * 0.0274958766106, CHAMFER4_SIZE * 0.999621916911), (0, 0), align=None)
    chamfer4_piece_5a = extrude(amount=35.317474093, mode=Mode.PRIVATE)
    chamfer4_piece_5a = split(chamfer4_piece_5a, bisect_by=Plane(origin=(25.515371071, 9.434043338, -6.680825493), z_dir=(1, 0, 0)), keep=Keep.TOP, mode=Mode.PRIVATE)
    with BuildSketch(Plane(origin=(25.515371071, 10.753217845, 2.286731952), x_dir=(-0.027495876610586494, -0.9996219169112968, 0), z_dir=(0, 0, -1))) as chamfer4_piece_5b_section:
        Polygon((CHAMFER4_SIZE * 0.999621916911, -CHAMFER4_SIZE * 0.0274958766106), (-CHAMFER4_SIZE * 0.0274958766106, -CHAMFER4_SIZE * 0.999621916911), (0, 0), align=None)
    chamfer4_piece_5b = extrude(amount=47.558418213, mode=Mode.PRIVATE)
    chamfer4_piece_5b = split(chamfer4_piece_5b, bisect_by=Plane(origin=(26.834545578, 9.434043338, -2.578890647), z_dir=(0, 0, -1)), keep=Keep.TOP, mode=Mode.PRIVATE)
    chamfer4_piece_5b = split(chamfer4_piece_5b, bisect_by=Plane(origin=(26.834545578, 9.434043338, -8), z_dir=(0, 0, 1)), keep=Keep.TOP, mode=Mode.PRIVATE)
    chamfer4_piece_5 = chamfer4_piece_5a & chamfer4_piece_5b
    add(chamfer4_piece_5, mode=Mode.SUBTRACT)

    # Sketch20 → Boss-Extrude9 (add)
    with BuildSketch(Plane(origin=(0, 0, -34.984954309), x_dir=(-1, 0, 0), z_dir=(0, 0, -1))):
        with Locations((1, 0.5)):
            Rectangle(SKETCH20_W, SKETCH20_H)
    extrude(amount=-BOSS_EXTRUDE9_DEPTH)


solid = part.part
